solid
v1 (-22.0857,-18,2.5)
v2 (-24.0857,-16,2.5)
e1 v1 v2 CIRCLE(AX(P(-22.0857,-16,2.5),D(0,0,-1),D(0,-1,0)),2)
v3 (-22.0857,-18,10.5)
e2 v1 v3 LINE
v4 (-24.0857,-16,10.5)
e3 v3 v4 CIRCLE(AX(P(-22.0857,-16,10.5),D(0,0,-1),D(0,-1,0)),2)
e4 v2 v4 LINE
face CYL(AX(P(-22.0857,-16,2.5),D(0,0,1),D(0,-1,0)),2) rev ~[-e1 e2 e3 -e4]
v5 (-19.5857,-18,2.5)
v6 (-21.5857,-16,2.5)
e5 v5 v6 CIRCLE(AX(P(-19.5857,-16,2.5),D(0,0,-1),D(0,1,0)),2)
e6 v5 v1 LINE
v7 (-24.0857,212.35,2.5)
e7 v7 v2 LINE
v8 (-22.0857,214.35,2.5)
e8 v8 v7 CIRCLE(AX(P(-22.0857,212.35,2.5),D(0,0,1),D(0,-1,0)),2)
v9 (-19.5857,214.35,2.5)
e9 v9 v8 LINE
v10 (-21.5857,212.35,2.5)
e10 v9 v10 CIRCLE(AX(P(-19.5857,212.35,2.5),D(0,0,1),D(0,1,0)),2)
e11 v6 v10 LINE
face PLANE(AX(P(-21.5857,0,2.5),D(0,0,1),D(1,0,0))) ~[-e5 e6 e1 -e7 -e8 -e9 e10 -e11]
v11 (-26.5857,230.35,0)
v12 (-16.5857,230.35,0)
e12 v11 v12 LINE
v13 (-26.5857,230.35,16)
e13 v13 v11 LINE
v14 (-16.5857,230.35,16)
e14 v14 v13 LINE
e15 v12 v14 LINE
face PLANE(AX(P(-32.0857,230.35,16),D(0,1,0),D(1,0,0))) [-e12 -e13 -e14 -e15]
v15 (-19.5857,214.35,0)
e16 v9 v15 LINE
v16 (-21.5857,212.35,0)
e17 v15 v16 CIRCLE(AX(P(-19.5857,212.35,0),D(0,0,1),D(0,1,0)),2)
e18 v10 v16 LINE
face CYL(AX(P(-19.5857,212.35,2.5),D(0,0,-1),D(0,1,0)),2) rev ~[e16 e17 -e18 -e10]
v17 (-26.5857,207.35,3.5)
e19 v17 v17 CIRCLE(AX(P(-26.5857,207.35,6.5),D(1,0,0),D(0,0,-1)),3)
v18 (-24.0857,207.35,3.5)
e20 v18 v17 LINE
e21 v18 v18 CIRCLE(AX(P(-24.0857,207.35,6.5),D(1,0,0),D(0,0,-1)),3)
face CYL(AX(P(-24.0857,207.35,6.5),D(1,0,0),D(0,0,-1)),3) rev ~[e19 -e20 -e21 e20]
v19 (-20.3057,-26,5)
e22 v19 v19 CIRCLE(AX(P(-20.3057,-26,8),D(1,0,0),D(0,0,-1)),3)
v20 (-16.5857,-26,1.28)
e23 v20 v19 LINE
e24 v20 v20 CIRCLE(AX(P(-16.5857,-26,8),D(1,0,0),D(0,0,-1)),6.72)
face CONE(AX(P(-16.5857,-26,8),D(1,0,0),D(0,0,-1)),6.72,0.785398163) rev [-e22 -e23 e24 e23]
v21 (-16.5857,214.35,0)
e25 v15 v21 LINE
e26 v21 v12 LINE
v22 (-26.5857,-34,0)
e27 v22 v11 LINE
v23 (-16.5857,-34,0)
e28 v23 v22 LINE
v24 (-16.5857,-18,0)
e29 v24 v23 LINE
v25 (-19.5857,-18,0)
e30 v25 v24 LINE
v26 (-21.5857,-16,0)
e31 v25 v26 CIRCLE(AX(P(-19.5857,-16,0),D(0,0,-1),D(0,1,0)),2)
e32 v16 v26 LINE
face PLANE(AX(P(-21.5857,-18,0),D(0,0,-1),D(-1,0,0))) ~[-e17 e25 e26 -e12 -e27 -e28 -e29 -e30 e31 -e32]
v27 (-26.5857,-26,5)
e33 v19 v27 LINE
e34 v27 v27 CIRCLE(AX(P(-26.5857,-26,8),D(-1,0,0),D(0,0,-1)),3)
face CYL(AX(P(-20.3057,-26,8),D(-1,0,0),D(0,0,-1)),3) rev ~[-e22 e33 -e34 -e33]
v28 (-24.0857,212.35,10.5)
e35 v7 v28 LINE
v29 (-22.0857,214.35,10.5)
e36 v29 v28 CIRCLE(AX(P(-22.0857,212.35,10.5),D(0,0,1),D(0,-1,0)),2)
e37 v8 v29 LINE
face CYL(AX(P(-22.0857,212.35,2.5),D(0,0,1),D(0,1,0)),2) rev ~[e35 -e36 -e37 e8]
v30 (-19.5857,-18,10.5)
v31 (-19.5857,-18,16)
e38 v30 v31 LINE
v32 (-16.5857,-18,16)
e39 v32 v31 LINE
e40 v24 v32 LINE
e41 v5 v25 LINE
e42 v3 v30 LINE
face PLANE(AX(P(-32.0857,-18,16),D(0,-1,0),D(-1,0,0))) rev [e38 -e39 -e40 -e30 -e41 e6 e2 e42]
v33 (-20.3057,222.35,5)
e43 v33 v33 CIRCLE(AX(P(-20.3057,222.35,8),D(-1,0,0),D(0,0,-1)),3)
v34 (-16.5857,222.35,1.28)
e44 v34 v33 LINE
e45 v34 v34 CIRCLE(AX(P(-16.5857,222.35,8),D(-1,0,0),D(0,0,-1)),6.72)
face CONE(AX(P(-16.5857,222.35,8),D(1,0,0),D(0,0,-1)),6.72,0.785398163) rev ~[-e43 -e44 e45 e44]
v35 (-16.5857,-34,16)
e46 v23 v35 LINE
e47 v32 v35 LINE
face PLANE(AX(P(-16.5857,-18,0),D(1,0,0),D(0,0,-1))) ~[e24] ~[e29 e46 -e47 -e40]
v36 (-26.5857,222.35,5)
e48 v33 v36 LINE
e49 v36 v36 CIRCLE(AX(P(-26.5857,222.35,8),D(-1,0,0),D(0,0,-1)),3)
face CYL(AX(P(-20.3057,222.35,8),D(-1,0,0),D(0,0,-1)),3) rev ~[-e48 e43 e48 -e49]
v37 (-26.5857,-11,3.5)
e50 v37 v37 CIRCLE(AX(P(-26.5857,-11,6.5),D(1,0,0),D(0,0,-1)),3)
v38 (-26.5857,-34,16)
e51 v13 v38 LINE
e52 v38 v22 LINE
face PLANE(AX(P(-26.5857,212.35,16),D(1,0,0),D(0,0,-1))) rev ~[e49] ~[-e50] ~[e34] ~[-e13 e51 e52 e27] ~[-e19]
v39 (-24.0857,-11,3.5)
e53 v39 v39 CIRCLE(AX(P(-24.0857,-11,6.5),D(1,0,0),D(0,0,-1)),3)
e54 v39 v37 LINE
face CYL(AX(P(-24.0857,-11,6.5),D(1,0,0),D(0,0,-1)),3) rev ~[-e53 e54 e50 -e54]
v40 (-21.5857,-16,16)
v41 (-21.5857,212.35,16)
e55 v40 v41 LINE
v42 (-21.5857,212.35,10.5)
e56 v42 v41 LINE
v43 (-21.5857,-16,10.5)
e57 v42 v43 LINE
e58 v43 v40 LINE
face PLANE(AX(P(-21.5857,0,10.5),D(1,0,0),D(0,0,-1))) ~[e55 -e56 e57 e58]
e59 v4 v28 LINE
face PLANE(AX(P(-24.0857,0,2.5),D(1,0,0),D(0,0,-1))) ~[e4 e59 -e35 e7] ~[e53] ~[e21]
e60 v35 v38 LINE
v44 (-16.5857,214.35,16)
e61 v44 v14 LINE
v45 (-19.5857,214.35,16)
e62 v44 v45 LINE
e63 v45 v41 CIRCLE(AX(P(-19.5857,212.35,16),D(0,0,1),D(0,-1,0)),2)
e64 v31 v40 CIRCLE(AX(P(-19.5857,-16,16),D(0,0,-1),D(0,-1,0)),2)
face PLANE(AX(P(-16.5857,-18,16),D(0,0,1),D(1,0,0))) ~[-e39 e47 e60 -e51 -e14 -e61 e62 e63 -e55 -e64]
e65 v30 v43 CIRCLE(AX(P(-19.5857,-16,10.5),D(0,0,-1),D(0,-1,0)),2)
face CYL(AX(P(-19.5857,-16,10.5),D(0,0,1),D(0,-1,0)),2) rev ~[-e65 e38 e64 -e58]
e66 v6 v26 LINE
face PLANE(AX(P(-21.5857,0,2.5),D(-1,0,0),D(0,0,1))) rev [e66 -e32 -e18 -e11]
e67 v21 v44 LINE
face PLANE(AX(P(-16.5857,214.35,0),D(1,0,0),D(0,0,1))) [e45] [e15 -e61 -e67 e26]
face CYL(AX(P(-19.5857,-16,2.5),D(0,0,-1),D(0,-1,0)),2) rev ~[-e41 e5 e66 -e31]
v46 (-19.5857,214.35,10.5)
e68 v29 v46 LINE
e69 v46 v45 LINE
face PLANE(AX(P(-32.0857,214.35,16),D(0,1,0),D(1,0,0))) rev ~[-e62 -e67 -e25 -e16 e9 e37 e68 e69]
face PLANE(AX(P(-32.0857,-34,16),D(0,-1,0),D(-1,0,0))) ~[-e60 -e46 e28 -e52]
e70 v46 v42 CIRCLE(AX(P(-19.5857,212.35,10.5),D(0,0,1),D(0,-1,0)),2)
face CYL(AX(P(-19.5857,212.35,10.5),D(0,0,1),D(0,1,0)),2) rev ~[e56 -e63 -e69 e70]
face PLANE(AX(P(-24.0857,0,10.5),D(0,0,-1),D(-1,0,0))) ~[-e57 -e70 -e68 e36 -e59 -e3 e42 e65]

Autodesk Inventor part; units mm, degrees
ref_plane "YZ Plane" through (0, 0, 0) normal (1, 0, 0) x (0, 1, 0)
sketch "Sketch2" plane through (0, 0, 0) normal (0, 0, 1) x (1, 0, 0)
  line L0 (-32.0857, 0) -> (0, 0)
  line L1 (0, 0) -> (0, 19.635)
  line L2 (0, 19.635) -> (-32.0857, 19.635)
  spline S0 degree 3 poles (-32.0857, 19.635) (-32.0786, 19.6019) (-32.0585, 19.4984) (-32.0378, 19.3226) (-32.0222, 19.1083) (-32.0293, 18.8935) (-32.0484, 18.6795) (-32.102, 18.3981) (-32.1765, 18.0482) (-32.2416, 17.6965) (-32.2997, 17.416) (-32.364, 17.211) (-32.4396, 17.0099) (-32.536, 16.8179) (-32.6409, 16.6304) (-32.7641, 16.4543) (-32.8983, 16.2866) (-33.043, 16.1278) (-33.201, 15.9822) (-33.3669, 15.8459) (-33.5414, 15.7205) (-33.7857, 15.5713) (-34.1055, 15.4094) (-34.509, 15.2608) (-34.9249, 15.1525) (-35.3479, 15.078) (-35.7753, 15.0341) (-36.2047, 15.0215) (-36.6341, 15.0313) (-37.0623, 15.0646) (-37.3462, 15.1014) (-37.4881, 15.1198) knots -0.847201 -0.847201 -0.847201 -0.847201 -0.83705 -0.815587 -0.794126 -0.772659 -0.751201 -0.729734 -0.686802 -0.64387 -0.622403 -0.600945 -0.579478 -0.558017 -0.536554 -0.515088 -0.49363 -0.472163 -0.450698 -0.429238 -0.407769 -0.386302 -0.343394 -0.300476 -0.257562 -0.214646 -0.17172 -0.12879 -0.085861 -0.04293 0 0 0 0
  spline S1 degree 3 poles (-37.4881, 15.1198) (-37.594, 15.1249) (-37.8057, 15.1352) (-38.2295, 15.119) (-38.7575, 15.0717) (-39.3865, 14.9771) (-40.0103, 14.8535) (-40.6285, 14.7043) (-41.2408, 14.5326) (-41.847, 14.3405) (-42.4469, 14.1297) (-43.0405, 13.9015) (-43.6276, 13.6572) (-44.2081, 13.3977) (-44.782, 13.1239) (-45.3493, 12.8367) (-45.9097, 12.5363) (-46.4639, 12.2246) (-46.8275, 12.0066) (-47.0092, 11.8976) knots -1.017256 -1.017256 -1.017256 -1.017256 -0.985476 -0.953687 -0.890117 -0.826542 -0.762964 -0.699386 -0.635807 -0.572227 -0.508647 -0.445066 -0.381486 -0.317905 -0.254324 -0.190743 -0.127162 -0.063581 0 0 0 0
  arc A0 (-47.0092, 11.8976) -> (-47.0092, 7.7374) centre (9.2023, 9.8175) ccw
  spline S2 degree 3 poles (-47.0092, 7.7374) (-46.8275, 7.6284) (-46.4639, 7.4104) (-45.9097, 7.0987) (-45.3493, 6.7983) (-44.782, 6.5111) (-44.2081, 6.2373) (-43.6276, 5.9778) (-43.0405, 5.7335) (-42.4469, 5.5053) (-41.847, 5.2945) (-41.2408, 5.1024) (-40.6285, 4.9307) (-40.0103, 4.7815) (-39.3865, 4.6579) (-38.7575, 4.5633) (-38.2295, 4.516) (-37.8057, 4.4998) (-37.594, 4.5101) (-37.4881, 4.5152) knots -1.017256 -1.017256 -1.017256 -1.017256 -0.953675 -0.890094 -0.826513 -0.762932 -0.699351 -0.63577 -0.572189 -0.508609 -0.445029 -0.381449 -0.31787 -0.254291 -0.190714 -0.127139 -0.063568 -0.03178 0 0 0 0
  spline S3 degree 3 poles (-37.4881, 4.5152) (-37.3462, 4.5336) (-37.0623, 4.5704) (-36.6341, 4.6037) (-36.2047, 4.6135) (-35.7753, 4.6009) (-35.3479, 4.557) (-34.9249, 4.4825) (-34.509, 4.3742) (-34.1055, 4.2256) (-33.7857, 4.0637) (-33.5414, 3.9145) (-33.3669, 3.7891) (-33.201, 3.6528) (-33.043, 3.5072) (-32.8983, 3.3484) (-32.7641, 3.1807) (-32.6409, 3.0046) (-32.536, 2.8171) (-32.4396, 2.6251) (-32.364, 2.424) (-32.2997, 2.219) (-32.2416, 1.9385) (-32.1765, 1.5868) (-32.102, 1.2369) (-32.0484, 0.9555) (-32.0293, 0.7415) (-32.0222, 0.5267) (-32.0378, 0.3124) (-32.0585, 0.1366) (-32.0786, 0.0331) (-32.0857, 0) knots -1.373604 -1.373604 -1.373604 -1.373604 -1.330674 -1.287743 -1.244814 -1.201884 -1.158958 -1.116042 -1.073128 -1.03021 -0.987302 -0.965835 -0.944366 -0.922906 -0.901441 -0.879974 -0.858516 -0.83705 -0.815587 -0.794126 -0.772659 -0.751201 -0.729734 -0.686802 -0.64387 -0.622403 -0.600945 -0.579478 -0.558017 -0.536554 -0.526403 -0.526403 -0.526403 -0.526403
extrude "Extrusion1" add sketch "Sketch2" along normal blind 16
pattern_linear "Rectangular Pattern1" count 10 spacing 19.635 along (0, 1, 0) of "Extrusion1"
sketch "Sketch5" plane through (-32.0857, 0, 0) normal (0, -1, 0) x (1, 0, 0)
  line L0 (32.0857, 0) -> (32.0857, 16) projected
  line L1 (0, 16) -> (32.0857, 16) projected
  line L2 (0, 0) -> (32.0857, 0) projected
  line L3 (0, 0) -> (0, 16) projected
  line L4 (0, 16) -> (8, 16)
  line L5 (8, 16) -> (8, 0) construction
  line L6 (8, 0) -> (0, 0)
  line L7 (0, 0) -> (0, 16)
  line L8 (8, 16) -> (10.5, 16)
  line L9 (10.5, 16) -> (10.5, 10.5)
  line L10 (10.5, 10.5) -> (8, 10.5)
  line L11 (8, 10.5) -> (8, 16) construction
  line L12 (8, 2.5) -> (10.5, 2.5)
  line L13 (10.5, 2.5) -> (10.5, 0)
  line L14 (10.5, 0) -> (8, 0)
  line L15 (8, 0) -> (8, 2.5) construction
  line L16 (8, 9.5) -> (37, 9.5) construction
  line L17 (37, 9.5) -> (37, 3.5) construction
  line L18 (37, 3.5) -> (8, 3.5) construction
  line L19 (8, 3.5) -> (8, 9.5) construction
  line L20 (8, 10.5) -> (8, 2.5)
  line L21 (34.5, 15.5) -> (10.5, 15.5) construction
  line L22 (10.5, 15.5) -> (10.5, 0.5) construction
  line L23 (10.5, 0.5) -> (34.5, 0.5) construction
  line L24 (34.5, 0.5) -> (34.5, 15.5) construction
  line L25 (41.5759, 16) -> (41.5759, 15.5) construction
  line L26 (41.5759, 0.5) -> (41.5759, 0) construction
  line L27 (25.6, 16.05) -> (19.4, 16.05) construction
  line L28 (19.4, -0.05) -> (25.6, -0.05) construction
  line L29 (25.6, -0.05) -> (25.6, 0.5) construction
  line L30 (25.6, 15.5) -> (25.6, 16.05) construction
  line L31 (19.4, 16.05) -> (19.4, 15.5) construction
  line L32 (19.4, 0.5) -> (19.4, -0.05) construction
  line L33 (25.6, 0.5) -> (25.6, 15.5) construction
  line L34 (19.4, 15.5) -> (19.4, 0.5) construction
  point P0 (9.25, 10.5)
  point P1 (9.25, 2.5)
  point P2 (8, 6.5)
  point P3 (8, 6.5)
  point P4 (22.5, 15.5)
  point P5 (22.5, 9.5)
  point P6 (22.5, -0.05)
  dimension "d15" = 8
  dimension "d16" = 8
  dimension "d18" = 6
  dimension "d19" = 29
  dimension "d20" = 24
  dimension "d21" = 6
  dimension "d22" = 3
  dimension "d23" = 2.5
  dimension "d24" = 2.5
  dimension "d30" = 5.5
  dimension "d31" = 2.5
  dimension "d64" = 6.2
  dimension "d65" = 16.1
extrude "Extrusion3" cut sketch "Sketch5" against normal through all contours L2 L13 L12 L20 L10 L9 L1 L0
sketch "Measurements" plane through (0, 0, 0) normal (0, 0, -1) x (-1, 0, 0)
  line L0 (41.7977, 19.635) -> (70.5831, 19.635) construction
  line L1 (141.7977, 176.7146) -> (141.7977, 118.484) construction
  line L2 (21.5857, 196.35) -> (21.5857, 0) projected
  line L3 (32.0857, 0) -> (21.5857, 0) projected
  circle A0 centre (91.7977, 19.635) radius 50 construction
  line L4 (41.7977, -40.4843) -> (41.7977, 79.7543) construction
  line L5 (41.7977, 19.635) -> (141.7977, 19.635) construction
  line L6 (141.7977, 19.635) -> (141.7977, 176.7146) construction
  arc A1 (41.7977, 19.635) -> (141.7977, 176.7146) centre (-31.5724, 176.7146) ccw construction
  circle A2 centre (91.7977, 176.7146) radius 50 construction
  line L7 (-14.9143, 139.9646) -> (32.0857, 139.9646) construction
  line L8 (32.0857, 139.9646) -> (32.0857, 213.4646) construction
  line L9 (32.0857, 213.4646) -> (-14.9143, 213.4646) construction
  line L10 (-14.9143, 213.4646) -> (-14.9143, 139.9646) construction
  circle A3 centre (91.7977, 176.7146) radius 5 construction
  line L11 (32.0857, 139.9646) -> (96.4406, 164.572) construction
  arc A4 (96.4406, 164.572) -> (96.4406, 188.8572) centre (91.7977, 176.7146) ccw construction
  line L12 (96.4406, 188.8572) -> (32.0857, 213.4646) construction
  line L13 (-14.9143, -17.115) -> (32.0857, -17.115) construction
  line L14 (32.0857, -17.115) -> (32.0857, 56.385) construction
  line L15 (32.0857, 56.385) -> (-14.9143, 56.385) construction
  line L16 (-14.9143, 56.385) -> (-14.9143, -17.115) construction
  circle A5 centre (91.7977, 19.635) radius 5 construction
  line L17 (32.0857, -17.115) -> (96.4406, 7.4924) construction
  arc A6 (96.4406, 7.4924) -> (96.4406, 31.7776) centre (91.7977, 19.635) ccw construction
  line L18 (96.4406, 31.7776) -> (32.0857, 56.385) construction
  line L19 (96.7977, 176.7146) -> (96.7977, 157.197) construction
  line L20 (96.7977, 19.635) -> (96.7977, 0.1424) construction
  circle A7 centre (9.5857, 201.4646) radius 14.5 construction
  line L21 (-14.9143, 176.7146) -> (-21.6792, 176.7146)
  circle A8 centre (9.5857, 151.9646) radius 14.5 construction
  point P0 (0, 0)
  point P1 (32.0857, 176.7146)
  point P2 (104.7977, 176.7146)
  point P3 (104.7977, 19.635)
  point P4 (32.0857, 19.635)
  dimension "d43" = 10
  dimension "d32" = 100
  dimension "d33" = 157.0796
  dimension "d34" = 59.712
  dimension "d36" = 73.5
  dimension "d37" = 47
  dimension "d38" = 73.5
  dimension "d39" = 47
  dimension "d41" = 8
  dimension "d44" = 17.115
  dimension "d66" = 29
  dimension "d67" = 12
  dimension "d68" = 24.5
ref_plane "Midplane" through (-32.0857, 98.175, 0) normal (0, -1, 0) x (1, 0, 0)
sketch "Sketch10" plane through (-32.0857, 196.35, 16) normal (0, 1, 0) x (1, 0, 0)
  line L0 (0, 16) -> (0, 0) projected
  line L1 (10.5, 16) -> (0, 16) projected
  line L2 (0, 16) -> (10.5, 16)
  line L3 (10.5, 13.5) -> (10.5, 16)
  line L4 (10.5, 13.5) -> (8, 13.5) projected
  line L5 (8, 13.5) -> (10.5, 13.5)
  line L6 (8, 13.5) -> (8, 5.5) projected
  line L7 (8, 5.5) -> (8, 13.5)
  line L8 (8, 5.5) -> (10.5, 5.5) projected
  line L9 (10.5, 5.5) -> (8, 5.5)
  line L10 (10.5, 5.5) -> (10.5, 0)
  line L11 (10.5, 0) -> (0, 0)
  line L12 (0, 0) -> (0, 16)
  point P0 (32.0857, 16)
extrude "Extra" add sketch "Sketch10" along normal blind 18
sketch "Sketch11" plane through (-32.0857, 214.35, 16) normal (0, 1, 0) x (1, 0, 0)
  line L0 (0, 16) -> (15.5, 16)
  line L1 (15.5, 16) -> (15.5, 0)
  line L2 (15.5, 0) -> (0, 0)
  line L3 (0, 0) -> (0, 16)
  line L4 (0, 0) -> (10.5, 0) projected
  line L5 (10.5, 16) -> (0, 16) projected
  line L6 (10.5, 0) -> (10.5, 5.5) projected
  line L7 (0, 16) -> (0, 0) projected
  point P0 (32.0857, 16)
  dimension "d63" = 5
extrude "Bracket" add sketch "Sketch11" along normal blind 16
sketch "Sketch13" plane through (-16.5857, 214.35, 16) normal (1, 0, 0) x (0, 0, -1)
  circle A0 centre (8, 8) radius 5.865
  line L0 (16, 0) -> (16, 16) projected
  line L1 (0, 16) -> (16, 16) projected
  point P0 (16, -214.35)
  point P1 (16, 8)
  point P2 (8, 16)
  dimension "d69" = 11.73
hole "Hole1" at (-16.5857, 222.35, 8) direction (-1, 0, 0) diameter 6 end through all countersink diameter 13.44 countersink angle 90
fillet "Fillet2" radius 2 3 edges at (-21.5857, 214.35, 1.25) (-24.0857, 214.35, 6.5) (-21.5857, 214.35, 13.25)
mirror "Mirror3" about plane through (-32.0857, 98.175, 0) normal (0, -1, 0) of "Fillet2", "Hole1", "Bracket", "Extra"
ref_plane "Work Plane3" through (-26.5857, 212.35, 16) normal (1, 0, 0) x (0, 0, -1)
sketch "Sketch14" plane through (-26.5857, 212.35, 16) normal (1, 0, 0) x (0, 0, -1)
  line L0 (26.8583, 24.8606) -> (-9.9213, 24.8606)
  line L1 (-9.9213, 24.8606) -> (-9.9213, -261.2458)
  line L2 (-9.9213, -261.2458) -> (26.8583, -261.2458)
  line L3 (26.8583, -261.2458) -> (26.8583, 24.8606)
  point P0 (16, -212.35)
extrude "Extrusion7" cut sketch "Sketch14" against normal through all
sketch "Sketch15" plane through (-24.0857, 212.35, 10.5) normal (1, 0, 0) x (0, 0, -1)
  circle A0 centre (4, -223.35) radius 3
  line L0 (-47.7239, -114.175) -> (-79.2168, -114.175)
  line L1 (-32.3539, 18) -> (-32.3539, -246.35) construction
  circle A1 centre (4, -5) radius 3
  line L2 (8, 2) -> (0, 2) projected
  line L3 (8, -228.35) -> (0, -228.35) projected
  line L4 (-5.5, -246.35) -> (10.5, -246.35) projected
  point P0 (0, 18)
  point P1 (-32.3539, -114.175)
  point P2 (4, 2)
  point P3 (-5.5, 18)
  dimension "d82" = 6
  dimension "d83" = 5
  dimension "d86" = 23
  dimension "d87" = 9.5
extrude "Extrusion8" cut sketch "Sketch15" against normal through all
properties part number "rack6mm-v2-top"
